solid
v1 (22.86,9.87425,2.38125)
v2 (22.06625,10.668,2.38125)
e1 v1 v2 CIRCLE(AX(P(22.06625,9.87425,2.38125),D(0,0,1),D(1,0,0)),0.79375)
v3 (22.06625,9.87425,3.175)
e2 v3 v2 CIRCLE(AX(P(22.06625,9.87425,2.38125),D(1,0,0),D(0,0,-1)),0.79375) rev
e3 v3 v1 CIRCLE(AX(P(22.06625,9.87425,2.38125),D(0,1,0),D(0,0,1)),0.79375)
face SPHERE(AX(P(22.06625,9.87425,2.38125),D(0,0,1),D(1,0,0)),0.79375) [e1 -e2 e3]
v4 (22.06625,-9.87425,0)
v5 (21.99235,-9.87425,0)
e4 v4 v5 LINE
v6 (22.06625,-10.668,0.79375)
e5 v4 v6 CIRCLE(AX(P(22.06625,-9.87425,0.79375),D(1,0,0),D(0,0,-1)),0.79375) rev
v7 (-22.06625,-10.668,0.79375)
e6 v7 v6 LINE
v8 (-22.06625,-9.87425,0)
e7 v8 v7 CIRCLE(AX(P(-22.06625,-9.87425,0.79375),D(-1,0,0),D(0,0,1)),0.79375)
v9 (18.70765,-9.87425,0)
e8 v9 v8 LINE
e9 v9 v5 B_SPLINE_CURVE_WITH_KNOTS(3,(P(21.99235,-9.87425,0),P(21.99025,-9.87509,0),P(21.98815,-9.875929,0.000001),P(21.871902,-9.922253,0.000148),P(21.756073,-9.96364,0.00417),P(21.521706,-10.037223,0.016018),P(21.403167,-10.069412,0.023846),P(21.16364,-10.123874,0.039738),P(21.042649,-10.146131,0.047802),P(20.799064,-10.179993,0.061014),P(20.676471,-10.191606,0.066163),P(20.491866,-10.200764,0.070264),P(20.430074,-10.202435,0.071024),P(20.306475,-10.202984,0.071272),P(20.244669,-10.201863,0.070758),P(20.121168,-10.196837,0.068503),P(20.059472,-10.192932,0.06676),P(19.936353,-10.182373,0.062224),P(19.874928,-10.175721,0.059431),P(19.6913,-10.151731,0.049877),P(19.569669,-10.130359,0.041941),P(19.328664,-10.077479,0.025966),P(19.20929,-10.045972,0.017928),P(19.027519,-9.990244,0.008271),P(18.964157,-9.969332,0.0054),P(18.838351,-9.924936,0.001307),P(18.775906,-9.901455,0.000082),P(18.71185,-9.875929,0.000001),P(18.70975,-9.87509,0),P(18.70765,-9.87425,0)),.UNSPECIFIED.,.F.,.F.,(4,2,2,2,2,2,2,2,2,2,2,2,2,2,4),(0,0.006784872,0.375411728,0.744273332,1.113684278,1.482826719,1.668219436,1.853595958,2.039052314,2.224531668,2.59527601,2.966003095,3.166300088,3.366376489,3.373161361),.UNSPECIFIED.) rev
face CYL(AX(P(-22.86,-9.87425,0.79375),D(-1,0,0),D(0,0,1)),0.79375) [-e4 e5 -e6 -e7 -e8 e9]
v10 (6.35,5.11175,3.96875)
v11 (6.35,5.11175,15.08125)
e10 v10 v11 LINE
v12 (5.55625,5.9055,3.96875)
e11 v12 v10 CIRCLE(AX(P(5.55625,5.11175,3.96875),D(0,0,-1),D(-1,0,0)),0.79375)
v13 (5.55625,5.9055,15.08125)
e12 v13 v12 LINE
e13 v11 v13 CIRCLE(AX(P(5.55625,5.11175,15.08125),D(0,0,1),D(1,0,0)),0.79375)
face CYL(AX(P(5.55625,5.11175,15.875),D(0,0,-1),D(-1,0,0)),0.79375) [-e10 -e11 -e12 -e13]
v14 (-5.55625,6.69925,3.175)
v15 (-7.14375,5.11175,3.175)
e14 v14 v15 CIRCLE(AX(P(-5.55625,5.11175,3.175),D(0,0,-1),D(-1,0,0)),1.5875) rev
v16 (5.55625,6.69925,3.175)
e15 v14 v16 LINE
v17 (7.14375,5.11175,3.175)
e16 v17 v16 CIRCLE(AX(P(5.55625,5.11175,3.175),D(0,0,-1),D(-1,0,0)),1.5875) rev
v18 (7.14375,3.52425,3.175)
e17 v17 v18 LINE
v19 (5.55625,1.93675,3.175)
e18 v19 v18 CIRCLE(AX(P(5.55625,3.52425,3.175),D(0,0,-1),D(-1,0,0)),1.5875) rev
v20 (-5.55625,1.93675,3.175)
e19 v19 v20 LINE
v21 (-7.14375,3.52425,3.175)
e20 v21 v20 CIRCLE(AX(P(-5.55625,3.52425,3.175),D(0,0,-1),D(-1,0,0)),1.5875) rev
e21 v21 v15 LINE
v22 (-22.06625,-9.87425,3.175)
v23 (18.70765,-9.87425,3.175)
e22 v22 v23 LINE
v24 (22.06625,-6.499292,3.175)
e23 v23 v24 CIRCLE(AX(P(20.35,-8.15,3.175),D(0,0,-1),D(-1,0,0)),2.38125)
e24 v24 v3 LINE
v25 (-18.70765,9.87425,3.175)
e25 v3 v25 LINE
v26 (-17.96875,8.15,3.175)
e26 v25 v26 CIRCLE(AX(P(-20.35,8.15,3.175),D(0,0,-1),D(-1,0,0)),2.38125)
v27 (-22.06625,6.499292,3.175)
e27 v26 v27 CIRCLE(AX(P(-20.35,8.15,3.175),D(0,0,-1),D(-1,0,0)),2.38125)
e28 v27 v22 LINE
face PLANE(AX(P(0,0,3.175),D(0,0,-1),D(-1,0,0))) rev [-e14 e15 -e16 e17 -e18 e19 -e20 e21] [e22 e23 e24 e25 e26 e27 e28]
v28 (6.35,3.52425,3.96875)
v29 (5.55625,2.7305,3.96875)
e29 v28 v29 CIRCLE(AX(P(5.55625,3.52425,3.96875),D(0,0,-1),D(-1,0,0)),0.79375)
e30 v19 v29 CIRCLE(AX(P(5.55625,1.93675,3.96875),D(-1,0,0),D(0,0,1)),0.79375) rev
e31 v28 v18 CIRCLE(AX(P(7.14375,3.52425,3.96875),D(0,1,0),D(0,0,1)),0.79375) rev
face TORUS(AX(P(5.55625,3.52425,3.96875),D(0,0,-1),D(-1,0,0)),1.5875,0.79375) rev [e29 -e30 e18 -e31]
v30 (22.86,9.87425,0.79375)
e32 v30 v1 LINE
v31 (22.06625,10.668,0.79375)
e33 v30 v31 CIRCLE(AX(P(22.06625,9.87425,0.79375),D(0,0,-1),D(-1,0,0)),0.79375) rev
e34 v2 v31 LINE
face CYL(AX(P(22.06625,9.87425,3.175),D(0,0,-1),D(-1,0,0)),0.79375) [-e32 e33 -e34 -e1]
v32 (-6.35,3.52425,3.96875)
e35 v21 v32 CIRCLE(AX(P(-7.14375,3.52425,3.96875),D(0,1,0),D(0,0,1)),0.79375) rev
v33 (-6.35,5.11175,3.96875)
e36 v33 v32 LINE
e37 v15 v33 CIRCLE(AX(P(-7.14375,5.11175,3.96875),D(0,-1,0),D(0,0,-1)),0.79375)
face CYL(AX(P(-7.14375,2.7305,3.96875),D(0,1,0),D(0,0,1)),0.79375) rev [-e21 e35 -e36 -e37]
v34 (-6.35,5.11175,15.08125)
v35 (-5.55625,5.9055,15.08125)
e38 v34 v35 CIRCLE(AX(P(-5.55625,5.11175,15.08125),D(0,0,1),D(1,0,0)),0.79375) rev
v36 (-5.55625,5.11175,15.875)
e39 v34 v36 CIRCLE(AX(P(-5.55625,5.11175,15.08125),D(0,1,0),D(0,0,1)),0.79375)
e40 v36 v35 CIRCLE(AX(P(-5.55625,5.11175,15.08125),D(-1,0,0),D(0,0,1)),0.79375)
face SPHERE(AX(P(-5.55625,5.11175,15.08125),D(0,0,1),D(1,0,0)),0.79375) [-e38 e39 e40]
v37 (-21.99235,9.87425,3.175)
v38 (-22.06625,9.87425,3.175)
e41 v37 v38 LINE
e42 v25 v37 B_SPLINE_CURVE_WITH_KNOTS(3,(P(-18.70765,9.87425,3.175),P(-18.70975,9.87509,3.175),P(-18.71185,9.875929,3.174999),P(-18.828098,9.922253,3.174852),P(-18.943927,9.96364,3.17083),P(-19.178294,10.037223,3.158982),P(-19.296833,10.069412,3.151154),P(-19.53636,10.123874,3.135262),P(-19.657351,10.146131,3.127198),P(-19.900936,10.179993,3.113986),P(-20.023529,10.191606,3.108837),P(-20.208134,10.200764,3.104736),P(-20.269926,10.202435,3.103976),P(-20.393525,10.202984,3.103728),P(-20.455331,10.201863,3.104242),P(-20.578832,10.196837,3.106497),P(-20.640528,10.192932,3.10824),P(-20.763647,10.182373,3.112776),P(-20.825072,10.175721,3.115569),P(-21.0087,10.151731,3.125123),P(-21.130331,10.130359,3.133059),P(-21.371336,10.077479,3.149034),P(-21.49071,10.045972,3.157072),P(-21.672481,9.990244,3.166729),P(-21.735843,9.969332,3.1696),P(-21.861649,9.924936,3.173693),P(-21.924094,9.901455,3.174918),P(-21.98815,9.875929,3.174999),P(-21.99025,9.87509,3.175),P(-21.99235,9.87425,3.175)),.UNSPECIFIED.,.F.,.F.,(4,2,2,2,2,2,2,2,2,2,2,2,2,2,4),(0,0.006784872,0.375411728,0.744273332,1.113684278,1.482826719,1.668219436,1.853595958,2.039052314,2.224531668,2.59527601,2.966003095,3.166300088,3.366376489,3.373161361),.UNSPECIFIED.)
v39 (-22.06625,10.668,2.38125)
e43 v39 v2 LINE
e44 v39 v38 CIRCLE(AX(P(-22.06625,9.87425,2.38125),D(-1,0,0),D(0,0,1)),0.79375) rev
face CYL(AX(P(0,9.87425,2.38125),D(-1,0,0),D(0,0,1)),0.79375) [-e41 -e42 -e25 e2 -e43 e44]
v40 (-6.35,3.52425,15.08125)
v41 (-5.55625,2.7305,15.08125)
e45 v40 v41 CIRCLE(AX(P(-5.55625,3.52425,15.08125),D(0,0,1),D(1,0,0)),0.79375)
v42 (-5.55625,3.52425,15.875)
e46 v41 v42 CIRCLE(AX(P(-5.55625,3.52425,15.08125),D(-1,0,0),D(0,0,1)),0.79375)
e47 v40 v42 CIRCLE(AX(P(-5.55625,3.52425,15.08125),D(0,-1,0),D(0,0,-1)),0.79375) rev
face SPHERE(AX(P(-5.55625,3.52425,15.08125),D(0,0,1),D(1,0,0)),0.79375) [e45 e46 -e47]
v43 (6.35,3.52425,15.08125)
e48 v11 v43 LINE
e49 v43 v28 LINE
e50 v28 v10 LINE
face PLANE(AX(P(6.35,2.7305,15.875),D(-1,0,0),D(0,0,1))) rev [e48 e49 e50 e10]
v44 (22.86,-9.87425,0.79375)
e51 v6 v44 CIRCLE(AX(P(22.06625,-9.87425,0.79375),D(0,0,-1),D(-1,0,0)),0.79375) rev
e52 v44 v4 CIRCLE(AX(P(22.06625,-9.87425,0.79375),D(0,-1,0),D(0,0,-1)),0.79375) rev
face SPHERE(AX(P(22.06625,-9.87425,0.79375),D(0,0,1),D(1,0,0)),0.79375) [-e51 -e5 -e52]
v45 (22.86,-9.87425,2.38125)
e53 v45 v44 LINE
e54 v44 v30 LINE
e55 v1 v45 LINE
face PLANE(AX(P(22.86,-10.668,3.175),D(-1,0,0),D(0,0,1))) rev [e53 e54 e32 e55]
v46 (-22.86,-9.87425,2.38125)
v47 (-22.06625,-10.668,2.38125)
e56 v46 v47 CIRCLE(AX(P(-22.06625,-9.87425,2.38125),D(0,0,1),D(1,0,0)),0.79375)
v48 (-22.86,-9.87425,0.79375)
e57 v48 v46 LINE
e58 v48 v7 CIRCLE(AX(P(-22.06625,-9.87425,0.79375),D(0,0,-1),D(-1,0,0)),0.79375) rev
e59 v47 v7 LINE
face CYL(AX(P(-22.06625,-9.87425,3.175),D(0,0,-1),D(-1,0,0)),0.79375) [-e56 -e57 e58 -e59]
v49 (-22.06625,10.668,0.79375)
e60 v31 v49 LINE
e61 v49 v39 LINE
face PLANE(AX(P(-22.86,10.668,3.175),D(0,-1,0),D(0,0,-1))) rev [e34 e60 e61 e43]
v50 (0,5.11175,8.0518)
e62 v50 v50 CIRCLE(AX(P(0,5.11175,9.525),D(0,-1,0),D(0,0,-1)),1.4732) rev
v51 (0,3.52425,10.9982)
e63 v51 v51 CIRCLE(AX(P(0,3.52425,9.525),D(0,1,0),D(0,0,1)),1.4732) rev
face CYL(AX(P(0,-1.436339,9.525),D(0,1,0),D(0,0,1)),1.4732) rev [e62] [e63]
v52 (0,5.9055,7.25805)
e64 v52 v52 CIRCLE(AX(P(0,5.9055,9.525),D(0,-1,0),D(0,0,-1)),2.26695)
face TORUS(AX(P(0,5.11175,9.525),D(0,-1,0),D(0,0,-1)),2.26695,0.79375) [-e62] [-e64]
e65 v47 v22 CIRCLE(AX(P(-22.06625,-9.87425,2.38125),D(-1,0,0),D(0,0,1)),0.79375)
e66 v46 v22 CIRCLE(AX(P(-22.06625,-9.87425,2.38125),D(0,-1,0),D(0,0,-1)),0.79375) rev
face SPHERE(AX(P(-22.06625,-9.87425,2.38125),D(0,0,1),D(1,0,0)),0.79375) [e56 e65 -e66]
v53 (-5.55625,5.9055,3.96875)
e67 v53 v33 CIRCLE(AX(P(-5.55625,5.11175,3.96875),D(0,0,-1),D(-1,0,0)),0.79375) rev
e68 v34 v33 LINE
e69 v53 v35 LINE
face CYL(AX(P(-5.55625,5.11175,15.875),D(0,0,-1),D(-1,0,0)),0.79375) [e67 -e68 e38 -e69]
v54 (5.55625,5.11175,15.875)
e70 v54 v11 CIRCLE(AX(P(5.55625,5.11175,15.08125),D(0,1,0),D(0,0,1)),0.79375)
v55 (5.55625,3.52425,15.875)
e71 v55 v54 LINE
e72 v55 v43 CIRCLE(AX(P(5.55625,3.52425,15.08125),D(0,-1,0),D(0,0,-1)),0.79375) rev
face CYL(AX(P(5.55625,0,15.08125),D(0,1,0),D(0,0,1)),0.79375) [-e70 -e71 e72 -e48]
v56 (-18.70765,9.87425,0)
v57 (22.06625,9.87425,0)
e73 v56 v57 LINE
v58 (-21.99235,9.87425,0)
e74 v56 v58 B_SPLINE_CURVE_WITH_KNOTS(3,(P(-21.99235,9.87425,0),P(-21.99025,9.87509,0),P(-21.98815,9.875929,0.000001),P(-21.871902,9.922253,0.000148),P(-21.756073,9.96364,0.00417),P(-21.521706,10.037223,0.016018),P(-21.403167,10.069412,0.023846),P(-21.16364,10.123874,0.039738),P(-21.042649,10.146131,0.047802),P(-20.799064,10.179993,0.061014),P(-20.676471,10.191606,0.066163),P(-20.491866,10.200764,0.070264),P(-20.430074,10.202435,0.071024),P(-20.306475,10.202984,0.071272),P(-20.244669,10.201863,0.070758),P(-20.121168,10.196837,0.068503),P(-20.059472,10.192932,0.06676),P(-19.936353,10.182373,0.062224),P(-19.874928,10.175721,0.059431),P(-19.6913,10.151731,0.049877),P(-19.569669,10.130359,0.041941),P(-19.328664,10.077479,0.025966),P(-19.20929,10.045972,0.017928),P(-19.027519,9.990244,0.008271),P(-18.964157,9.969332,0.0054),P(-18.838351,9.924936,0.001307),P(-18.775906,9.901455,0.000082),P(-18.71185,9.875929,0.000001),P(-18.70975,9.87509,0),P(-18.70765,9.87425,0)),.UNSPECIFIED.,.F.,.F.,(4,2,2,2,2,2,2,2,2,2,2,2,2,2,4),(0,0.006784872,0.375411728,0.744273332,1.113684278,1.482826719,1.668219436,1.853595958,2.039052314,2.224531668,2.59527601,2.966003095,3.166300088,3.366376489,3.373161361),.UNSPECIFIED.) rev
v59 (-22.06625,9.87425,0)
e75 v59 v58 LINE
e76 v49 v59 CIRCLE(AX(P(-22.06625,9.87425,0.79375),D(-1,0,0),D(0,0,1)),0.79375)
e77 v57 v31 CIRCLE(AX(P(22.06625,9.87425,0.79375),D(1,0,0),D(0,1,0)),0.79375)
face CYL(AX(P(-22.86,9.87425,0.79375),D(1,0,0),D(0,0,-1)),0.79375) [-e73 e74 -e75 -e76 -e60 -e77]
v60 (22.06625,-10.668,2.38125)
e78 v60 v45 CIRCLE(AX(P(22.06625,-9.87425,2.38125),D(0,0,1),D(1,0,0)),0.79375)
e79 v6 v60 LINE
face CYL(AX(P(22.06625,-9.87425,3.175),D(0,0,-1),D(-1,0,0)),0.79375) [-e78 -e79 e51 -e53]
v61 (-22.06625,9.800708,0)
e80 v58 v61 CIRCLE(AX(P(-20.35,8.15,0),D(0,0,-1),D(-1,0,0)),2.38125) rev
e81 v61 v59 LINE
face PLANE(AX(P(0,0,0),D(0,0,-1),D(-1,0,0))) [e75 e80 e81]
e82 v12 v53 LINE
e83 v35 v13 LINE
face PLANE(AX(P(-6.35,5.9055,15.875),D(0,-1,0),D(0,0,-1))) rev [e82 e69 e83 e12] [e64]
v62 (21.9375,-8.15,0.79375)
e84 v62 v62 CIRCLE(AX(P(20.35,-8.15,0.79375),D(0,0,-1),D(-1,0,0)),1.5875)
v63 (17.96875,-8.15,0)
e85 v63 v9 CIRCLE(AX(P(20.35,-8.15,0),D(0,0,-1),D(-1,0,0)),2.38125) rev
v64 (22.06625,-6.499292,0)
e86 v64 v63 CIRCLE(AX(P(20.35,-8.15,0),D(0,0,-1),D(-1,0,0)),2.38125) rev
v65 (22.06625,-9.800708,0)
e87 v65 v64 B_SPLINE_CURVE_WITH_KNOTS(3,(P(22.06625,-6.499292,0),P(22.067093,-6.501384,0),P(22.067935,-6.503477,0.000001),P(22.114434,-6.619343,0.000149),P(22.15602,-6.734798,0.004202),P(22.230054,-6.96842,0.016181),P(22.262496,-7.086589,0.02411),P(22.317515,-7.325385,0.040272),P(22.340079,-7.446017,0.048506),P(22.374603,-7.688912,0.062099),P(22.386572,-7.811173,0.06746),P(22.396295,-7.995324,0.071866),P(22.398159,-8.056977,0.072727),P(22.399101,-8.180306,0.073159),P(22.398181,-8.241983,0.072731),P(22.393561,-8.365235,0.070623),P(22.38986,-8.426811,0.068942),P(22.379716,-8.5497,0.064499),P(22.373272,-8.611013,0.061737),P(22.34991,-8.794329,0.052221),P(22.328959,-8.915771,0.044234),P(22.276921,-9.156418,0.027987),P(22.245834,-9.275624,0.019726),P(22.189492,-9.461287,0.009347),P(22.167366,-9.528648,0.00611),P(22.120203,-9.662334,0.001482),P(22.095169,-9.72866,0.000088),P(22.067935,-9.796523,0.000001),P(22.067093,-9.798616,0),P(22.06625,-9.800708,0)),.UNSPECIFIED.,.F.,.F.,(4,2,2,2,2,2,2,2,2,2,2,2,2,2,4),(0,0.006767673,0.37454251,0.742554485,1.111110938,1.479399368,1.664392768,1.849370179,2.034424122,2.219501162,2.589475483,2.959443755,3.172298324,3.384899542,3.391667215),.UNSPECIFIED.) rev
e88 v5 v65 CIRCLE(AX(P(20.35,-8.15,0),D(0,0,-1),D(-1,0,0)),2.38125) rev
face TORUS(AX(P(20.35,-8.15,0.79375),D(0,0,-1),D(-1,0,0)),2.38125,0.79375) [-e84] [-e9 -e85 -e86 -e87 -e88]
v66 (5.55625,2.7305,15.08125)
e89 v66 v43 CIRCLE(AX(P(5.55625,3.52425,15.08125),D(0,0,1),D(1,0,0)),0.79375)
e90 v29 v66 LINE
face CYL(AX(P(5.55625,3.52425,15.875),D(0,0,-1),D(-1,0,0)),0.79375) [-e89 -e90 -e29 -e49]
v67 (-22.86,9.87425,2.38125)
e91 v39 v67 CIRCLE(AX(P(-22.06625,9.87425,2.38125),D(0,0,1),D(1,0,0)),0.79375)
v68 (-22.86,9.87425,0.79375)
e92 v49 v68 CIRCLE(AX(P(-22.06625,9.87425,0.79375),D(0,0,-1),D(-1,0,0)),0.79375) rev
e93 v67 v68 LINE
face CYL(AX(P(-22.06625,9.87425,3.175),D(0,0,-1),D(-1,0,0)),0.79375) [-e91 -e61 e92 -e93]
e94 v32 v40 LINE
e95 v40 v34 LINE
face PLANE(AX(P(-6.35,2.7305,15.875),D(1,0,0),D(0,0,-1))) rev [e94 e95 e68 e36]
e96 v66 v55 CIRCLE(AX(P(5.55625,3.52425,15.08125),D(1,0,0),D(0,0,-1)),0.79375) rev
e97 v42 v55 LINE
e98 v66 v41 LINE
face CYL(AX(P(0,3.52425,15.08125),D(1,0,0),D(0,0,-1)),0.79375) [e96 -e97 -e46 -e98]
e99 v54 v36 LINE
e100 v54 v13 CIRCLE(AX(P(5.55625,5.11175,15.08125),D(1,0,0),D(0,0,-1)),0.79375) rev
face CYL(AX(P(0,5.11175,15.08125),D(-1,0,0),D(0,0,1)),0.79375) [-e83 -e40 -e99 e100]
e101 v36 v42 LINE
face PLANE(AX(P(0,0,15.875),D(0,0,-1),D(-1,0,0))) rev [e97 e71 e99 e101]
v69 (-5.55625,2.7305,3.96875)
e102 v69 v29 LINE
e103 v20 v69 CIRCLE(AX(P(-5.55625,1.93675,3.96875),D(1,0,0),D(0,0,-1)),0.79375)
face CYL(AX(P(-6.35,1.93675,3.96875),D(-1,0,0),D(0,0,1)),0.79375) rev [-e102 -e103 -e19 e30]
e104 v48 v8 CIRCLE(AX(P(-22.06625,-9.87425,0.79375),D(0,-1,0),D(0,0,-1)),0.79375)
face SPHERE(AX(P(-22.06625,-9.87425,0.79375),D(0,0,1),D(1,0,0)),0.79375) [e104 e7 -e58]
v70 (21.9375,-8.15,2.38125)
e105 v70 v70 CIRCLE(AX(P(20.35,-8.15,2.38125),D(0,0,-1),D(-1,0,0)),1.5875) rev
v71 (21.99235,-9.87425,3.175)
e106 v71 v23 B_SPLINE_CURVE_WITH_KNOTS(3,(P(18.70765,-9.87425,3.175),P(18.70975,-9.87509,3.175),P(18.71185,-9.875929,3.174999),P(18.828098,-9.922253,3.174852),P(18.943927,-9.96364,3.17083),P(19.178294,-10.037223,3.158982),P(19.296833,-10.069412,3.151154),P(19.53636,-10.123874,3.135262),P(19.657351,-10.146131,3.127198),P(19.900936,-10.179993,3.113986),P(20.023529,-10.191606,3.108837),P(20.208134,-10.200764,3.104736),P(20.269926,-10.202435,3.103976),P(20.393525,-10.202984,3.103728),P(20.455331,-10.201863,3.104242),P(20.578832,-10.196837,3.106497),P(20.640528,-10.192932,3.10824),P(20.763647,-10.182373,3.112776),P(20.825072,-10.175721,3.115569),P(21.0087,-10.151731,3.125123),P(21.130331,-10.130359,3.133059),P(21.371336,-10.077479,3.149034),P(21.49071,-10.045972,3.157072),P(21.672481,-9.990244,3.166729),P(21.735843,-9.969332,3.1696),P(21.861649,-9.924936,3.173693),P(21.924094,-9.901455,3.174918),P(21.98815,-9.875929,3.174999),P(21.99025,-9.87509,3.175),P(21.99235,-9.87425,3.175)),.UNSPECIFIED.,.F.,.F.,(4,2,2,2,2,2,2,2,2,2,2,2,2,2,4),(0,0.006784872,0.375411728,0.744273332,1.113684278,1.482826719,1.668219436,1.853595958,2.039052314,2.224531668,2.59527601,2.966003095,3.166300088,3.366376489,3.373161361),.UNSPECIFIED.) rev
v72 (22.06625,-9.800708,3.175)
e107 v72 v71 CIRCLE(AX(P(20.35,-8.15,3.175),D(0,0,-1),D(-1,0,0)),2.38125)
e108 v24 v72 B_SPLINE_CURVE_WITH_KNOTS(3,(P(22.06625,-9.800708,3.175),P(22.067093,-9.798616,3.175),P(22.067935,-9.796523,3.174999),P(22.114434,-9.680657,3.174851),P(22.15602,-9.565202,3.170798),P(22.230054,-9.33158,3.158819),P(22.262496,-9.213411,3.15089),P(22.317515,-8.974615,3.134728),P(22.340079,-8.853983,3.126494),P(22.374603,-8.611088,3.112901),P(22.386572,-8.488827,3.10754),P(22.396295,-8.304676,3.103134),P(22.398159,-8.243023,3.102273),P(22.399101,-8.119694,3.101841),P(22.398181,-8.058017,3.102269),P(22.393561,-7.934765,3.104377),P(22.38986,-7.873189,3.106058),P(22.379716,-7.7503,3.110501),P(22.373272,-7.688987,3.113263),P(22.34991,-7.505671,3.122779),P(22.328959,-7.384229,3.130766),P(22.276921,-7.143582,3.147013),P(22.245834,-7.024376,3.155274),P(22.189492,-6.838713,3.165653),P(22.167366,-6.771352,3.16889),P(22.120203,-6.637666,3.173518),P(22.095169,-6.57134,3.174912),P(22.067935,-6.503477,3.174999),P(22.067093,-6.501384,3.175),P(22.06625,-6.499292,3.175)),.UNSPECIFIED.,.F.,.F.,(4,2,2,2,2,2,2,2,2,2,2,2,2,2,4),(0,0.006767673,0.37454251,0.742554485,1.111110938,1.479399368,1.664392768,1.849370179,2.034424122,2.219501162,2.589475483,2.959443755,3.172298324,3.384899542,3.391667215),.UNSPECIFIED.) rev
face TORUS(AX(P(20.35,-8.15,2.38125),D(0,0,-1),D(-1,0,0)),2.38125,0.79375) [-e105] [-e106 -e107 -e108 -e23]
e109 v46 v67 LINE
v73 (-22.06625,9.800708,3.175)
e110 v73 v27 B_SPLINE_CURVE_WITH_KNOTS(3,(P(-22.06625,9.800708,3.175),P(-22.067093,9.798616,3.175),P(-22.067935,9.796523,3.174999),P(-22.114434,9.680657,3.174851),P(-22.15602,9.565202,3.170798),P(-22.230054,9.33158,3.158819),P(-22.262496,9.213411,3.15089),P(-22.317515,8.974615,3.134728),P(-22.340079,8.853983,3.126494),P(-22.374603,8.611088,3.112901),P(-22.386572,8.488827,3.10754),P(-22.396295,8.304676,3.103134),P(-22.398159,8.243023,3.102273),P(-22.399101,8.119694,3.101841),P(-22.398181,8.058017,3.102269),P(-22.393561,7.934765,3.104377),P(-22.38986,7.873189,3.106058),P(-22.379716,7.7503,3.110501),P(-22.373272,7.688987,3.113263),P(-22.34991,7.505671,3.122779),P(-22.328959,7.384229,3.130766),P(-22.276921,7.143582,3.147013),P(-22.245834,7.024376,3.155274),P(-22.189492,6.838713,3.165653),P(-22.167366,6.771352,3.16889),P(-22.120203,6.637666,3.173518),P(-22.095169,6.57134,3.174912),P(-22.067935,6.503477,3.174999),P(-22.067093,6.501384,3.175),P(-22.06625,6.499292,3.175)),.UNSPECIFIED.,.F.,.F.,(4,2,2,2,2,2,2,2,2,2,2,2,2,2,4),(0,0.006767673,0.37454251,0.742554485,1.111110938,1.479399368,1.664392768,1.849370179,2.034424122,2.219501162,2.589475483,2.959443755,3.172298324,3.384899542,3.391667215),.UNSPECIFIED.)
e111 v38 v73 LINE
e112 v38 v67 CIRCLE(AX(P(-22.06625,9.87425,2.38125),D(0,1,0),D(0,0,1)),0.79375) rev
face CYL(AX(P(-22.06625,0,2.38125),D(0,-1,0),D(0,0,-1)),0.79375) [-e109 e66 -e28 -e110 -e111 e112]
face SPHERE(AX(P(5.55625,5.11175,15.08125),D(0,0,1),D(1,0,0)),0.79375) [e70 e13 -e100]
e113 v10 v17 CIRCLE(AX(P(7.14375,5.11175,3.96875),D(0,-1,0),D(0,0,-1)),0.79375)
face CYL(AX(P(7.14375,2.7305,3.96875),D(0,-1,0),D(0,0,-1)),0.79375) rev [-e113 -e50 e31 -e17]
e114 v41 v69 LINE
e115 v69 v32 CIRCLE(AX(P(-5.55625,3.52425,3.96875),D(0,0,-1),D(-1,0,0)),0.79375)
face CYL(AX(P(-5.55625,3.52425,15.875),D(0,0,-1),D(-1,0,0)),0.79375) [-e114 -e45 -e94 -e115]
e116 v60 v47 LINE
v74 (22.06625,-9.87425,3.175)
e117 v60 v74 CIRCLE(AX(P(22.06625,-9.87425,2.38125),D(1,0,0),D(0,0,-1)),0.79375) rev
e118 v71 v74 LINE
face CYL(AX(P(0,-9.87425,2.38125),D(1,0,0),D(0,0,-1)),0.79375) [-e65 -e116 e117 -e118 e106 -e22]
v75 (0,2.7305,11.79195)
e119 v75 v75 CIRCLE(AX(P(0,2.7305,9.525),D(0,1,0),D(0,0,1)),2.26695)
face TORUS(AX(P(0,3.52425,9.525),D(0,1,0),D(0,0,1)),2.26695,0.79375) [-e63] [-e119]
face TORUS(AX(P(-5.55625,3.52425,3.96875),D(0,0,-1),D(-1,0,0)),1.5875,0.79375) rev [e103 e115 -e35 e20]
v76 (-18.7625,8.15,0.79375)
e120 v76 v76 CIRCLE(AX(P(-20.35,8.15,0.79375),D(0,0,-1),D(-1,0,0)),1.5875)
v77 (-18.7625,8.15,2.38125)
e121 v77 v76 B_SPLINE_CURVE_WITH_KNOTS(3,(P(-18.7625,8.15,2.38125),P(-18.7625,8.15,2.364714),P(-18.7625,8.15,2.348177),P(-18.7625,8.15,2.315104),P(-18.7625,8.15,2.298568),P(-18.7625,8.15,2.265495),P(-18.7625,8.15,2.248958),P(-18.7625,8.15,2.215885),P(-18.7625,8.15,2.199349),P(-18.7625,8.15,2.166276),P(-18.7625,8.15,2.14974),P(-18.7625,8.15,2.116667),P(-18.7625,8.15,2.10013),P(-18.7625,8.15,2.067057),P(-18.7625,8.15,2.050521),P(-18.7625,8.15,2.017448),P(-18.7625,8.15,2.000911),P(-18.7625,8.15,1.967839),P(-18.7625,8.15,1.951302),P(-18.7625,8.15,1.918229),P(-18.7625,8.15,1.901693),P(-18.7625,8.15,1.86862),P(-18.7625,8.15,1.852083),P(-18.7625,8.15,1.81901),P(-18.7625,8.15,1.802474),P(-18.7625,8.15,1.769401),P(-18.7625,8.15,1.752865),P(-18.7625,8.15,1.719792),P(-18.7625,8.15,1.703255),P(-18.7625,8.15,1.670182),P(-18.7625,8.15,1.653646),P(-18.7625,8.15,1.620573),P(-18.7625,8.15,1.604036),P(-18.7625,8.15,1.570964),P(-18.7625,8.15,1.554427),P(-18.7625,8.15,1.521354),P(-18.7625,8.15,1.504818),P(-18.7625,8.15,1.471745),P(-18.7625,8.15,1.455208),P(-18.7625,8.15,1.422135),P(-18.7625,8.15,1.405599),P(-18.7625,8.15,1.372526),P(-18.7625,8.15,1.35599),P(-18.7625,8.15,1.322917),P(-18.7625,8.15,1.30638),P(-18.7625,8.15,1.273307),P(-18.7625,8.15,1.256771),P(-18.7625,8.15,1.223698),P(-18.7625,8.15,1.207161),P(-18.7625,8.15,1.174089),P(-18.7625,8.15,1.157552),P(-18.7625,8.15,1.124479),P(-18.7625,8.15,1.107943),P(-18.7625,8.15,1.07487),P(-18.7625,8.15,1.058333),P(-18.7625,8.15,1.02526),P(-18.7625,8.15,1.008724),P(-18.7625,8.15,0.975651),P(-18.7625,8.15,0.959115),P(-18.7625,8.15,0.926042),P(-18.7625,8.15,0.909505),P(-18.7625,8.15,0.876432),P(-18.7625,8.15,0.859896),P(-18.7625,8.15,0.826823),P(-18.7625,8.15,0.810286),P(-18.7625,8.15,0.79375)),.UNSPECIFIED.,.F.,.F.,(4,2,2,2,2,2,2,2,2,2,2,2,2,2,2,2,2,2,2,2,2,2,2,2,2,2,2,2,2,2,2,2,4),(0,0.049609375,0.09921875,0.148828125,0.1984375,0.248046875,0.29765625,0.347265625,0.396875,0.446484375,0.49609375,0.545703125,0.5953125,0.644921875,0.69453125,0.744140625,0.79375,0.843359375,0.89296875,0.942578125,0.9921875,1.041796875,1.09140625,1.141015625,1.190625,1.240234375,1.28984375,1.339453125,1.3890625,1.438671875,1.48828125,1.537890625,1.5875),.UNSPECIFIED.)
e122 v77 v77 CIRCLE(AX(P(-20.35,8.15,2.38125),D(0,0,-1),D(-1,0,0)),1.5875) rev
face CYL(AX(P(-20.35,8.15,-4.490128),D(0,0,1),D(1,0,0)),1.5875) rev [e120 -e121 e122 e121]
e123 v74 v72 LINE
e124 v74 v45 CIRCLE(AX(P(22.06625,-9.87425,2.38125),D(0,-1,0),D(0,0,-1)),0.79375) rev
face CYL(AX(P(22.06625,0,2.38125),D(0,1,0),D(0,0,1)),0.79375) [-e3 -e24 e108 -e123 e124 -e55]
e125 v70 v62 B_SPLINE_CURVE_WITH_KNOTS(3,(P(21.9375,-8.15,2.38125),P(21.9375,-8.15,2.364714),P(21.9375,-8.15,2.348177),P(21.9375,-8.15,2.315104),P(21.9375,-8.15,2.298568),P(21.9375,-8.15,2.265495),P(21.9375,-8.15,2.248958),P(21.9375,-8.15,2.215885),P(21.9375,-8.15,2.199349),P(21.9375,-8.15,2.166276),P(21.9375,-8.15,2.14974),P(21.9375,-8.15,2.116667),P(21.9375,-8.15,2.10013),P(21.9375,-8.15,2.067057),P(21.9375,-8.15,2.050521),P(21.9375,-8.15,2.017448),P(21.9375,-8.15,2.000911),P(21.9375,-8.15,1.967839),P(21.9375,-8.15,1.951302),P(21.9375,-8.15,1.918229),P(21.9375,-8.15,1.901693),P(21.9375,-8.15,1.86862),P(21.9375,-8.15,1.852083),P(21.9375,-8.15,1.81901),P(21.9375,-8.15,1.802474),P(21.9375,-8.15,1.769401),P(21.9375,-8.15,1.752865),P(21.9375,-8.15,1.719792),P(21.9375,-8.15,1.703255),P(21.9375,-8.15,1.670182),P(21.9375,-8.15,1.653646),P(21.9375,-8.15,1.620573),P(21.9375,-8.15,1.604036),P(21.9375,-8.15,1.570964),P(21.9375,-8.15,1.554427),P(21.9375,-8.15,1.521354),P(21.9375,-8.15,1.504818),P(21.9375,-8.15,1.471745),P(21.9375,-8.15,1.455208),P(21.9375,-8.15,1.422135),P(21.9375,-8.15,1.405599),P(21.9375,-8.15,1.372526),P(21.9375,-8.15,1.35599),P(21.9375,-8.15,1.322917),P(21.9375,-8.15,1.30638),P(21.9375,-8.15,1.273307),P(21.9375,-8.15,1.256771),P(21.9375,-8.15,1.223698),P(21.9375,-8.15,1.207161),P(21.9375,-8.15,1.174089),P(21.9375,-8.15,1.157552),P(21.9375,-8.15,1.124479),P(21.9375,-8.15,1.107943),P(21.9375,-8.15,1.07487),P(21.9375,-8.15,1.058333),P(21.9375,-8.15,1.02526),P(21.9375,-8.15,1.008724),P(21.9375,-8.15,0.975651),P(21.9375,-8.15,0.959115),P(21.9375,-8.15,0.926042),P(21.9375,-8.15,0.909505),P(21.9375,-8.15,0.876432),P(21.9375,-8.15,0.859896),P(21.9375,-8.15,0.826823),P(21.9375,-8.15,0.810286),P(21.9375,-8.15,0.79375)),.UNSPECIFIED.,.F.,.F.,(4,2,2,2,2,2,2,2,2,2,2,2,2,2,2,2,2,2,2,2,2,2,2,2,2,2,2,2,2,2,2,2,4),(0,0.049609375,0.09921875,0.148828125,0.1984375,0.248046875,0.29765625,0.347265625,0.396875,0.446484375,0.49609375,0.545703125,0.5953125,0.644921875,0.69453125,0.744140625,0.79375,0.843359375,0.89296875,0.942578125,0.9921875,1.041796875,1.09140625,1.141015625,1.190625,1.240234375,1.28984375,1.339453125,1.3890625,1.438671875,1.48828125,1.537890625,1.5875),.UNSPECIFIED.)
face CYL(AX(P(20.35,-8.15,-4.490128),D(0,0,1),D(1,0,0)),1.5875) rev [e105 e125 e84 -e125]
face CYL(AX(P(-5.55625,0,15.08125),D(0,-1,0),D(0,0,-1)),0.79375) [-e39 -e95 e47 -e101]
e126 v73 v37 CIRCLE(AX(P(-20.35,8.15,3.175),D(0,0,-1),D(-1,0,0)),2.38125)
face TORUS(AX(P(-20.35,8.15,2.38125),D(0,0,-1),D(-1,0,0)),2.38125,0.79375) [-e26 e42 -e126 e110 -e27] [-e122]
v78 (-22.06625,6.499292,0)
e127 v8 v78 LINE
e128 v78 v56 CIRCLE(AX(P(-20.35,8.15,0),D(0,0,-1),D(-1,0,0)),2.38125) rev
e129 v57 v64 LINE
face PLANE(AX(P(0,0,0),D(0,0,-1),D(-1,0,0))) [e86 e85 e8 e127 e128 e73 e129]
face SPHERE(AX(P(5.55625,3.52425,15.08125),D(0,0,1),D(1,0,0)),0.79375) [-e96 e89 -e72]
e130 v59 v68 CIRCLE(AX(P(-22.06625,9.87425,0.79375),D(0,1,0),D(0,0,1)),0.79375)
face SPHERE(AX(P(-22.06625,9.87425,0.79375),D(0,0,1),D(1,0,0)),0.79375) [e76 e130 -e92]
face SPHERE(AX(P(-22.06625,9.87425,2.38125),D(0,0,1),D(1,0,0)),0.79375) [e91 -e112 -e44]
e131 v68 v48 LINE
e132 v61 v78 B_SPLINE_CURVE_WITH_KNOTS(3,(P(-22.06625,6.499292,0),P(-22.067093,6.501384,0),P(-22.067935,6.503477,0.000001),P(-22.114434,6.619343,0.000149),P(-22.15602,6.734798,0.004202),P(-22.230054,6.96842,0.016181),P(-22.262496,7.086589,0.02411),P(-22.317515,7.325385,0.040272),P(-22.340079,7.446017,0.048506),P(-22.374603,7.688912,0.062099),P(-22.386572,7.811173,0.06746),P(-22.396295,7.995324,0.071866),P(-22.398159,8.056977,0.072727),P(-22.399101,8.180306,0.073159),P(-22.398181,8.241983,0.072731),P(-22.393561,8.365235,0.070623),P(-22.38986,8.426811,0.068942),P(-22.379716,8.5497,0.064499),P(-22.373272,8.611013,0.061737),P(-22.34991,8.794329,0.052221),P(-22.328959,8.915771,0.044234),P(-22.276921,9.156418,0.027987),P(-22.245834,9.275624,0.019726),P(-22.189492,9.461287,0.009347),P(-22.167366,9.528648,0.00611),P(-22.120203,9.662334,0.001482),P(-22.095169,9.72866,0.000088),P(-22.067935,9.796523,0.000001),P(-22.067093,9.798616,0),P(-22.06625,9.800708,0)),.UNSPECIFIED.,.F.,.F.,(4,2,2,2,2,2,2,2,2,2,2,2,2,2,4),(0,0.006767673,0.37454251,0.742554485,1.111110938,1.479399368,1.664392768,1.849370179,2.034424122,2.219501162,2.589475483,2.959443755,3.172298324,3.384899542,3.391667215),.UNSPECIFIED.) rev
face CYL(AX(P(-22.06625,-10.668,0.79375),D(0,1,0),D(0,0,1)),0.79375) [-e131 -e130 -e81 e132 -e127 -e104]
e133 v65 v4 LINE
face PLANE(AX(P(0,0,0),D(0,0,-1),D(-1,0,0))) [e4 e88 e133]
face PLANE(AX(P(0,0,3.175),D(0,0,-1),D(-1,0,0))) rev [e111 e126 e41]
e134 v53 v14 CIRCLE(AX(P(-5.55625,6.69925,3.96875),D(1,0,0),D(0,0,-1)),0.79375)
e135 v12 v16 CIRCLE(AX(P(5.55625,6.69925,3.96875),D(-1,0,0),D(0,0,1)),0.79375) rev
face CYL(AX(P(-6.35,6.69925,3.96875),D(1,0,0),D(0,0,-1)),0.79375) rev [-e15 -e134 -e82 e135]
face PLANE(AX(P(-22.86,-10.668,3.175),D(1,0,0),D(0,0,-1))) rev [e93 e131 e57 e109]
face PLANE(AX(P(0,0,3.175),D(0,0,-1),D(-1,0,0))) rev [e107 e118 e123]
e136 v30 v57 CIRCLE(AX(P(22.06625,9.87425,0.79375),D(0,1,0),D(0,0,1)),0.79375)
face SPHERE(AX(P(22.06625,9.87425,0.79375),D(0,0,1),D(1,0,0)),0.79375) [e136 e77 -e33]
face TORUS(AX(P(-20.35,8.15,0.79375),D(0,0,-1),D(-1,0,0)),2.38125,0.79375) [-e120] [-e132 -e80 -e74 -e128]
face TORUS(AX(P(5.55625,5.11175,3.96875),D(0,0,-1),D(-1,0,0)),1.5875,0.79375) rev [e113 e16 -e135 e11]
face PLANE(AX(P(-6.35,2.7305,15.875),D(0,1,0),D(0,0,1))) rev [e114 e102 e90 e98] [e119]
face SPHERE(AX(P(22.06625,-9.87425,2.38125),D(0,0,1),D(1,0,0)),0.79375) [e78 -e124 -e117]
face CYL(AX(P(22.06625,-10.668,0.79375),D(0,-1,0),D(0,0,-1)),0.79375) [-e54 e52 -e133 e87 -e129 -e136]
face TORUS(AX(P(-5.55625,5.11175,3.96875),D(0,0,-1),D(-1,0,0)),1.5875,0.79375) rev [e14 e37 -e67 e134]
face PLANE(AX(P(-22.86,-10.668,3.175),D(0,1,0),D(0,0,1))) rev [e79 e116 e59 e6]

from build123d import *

# Parameters (mm, degrees)
SKETCH3_W           = 45.72
SKETCH3_H           = 21.336
BOSS_EXTRUDE1_DEPTH = 3.175
SKETCH4_R           = 1.5875
CUT_EXTRUDE1_DEPTH  = 3.175
SKETCH6_W           = 12.7
SKETCH6_H           = 3.175
BOSS_EXTRUDE2_DEPTH = 12.7
SKETCH7_R           = 1.4732
CUT_EXTRUDE2_DEPTH  = 3.175
FILLET1_R           = 0.79375


with BuildPart() as part:
    # Sketch3 → Boss-Extrude1 (new body)
    with BuildSketch(Plane.XY):
        Rectangle(SKETCH3_W, SKETCH3_H)
    extrude(amount=BOSS_EXTRUDE1_DEPTH)

    # Sketch4 → Cut-Extrude1 (cut)
    with BuildSketch(Plane.XY.offset(3.175)):
        with Locations((-20.35, 8.15)):
            Circle(SKETCH4_R)
        with Locations((20.35, -8.15)):
            Circle(SKETCH4_R)
    extrude(amount=-CUT_EXTRUDE1_DEPTH, mode=Mode.SUBTRACT)

    # Sketch6 → Boss-Extrude2 (add)
    with BuildSketch(Plane.XY.offset(3.175)):
        with Locations((0, 4.318)):
            Rectangle(SKETCH6_W, SKETCH6_H)
    extrude(amount=BOSS_EXTRUDE2_DEPTH)

    # Sketch7 → Cut-Extrude2 (cut)
    with BuildSketch(Plane(origin=(0, 5.9055, 0), x_dir=(1, 0, 0), z_dir=(0, 1, 0))):
        with Locations(Location((0, -9.525, 0), (0, 0, 270))):
            Circle(SKETCH7_R)
    extrude(amount=-CUT_EXTRUDE2_DEPTH, mode=Mode.SUBTRACT)

    # Fillet1
    # the kernel refuses this fillet: 0.79375 mm, written as the material it takes off along each edge
    with BuildSketch(Plane(origin=(-22.06625, 9.87425, 2.38125), x_dir=(0, 0, 1), z_dir=(-1, 0, 0))) as fillet1_piece_1_section:
        Polygon((0, 0), (FILLET1_R, 0), (FILLET1_R, FILLET1_R), (0, FILLET1_R), align=None)
    fillet1_piece_1 = extrude(amount=FILLET1_R, mode=Mode.PRIVATE)
    fillet1_piece_1 = fillet1_piece_1 - Plane(origin=(-22.06625, 9.87425, 2.38125), x_dir=(0, -0.7071067811865475, -0.7071067811865475), z_dir=(-1, 0, 0)) * Sphere(FILLET1_R, mode=Mode.PRIVATE)
    add(fillet1_piece_1, mode=Mode.SUBTRACT)
    with BuildSketch(Plane(origin=(-22.06625, -9.87425, 2.38125), x_dir=(-1, 0, 0), z_dir=(0, -1, 0))) as fillet1_piece_2_section:
        Polygon((0, 0), (FILLET1_R, 0), (FILLET1_R, -FILLET1_R), (0, -FILLET1_R), align=None)
    fillet1_piece_2 = extrude(amount=FILLET1_R, mode=Mode.PRIVATE)
    fillet1_piece_2 = fillet1_piece_2 - Plane(origin=(-22.06625, -9.87425, 2.38125), x_dir=(0.7071067811865475, 0, -0.7071067811865475), z_dir=(0, -1, 0)) * Sphere(FILLET1_R, mode=Mode.PRIVATE)
    add(fillet1_piece_2, mode=Mode.SUBTRACT)
    with BuildSketch(Plane(origin=(22.06625, -9.87425, 2.38125), x_dir=(1, 0, 0), z_dir=(0, -1, 0))) as fillet1_piece_3_section:
        Polygon((0, 0), (FILLET1_R, 0), (FILLET1_R, FILLET1_R), (0, FILLET1_R), align=None)
    fillet1_piece_3 = extrude(amount=FILLET1_R, mode=Mode.PRIVATE)
    fillet1_piece_3 = fillet1_piece_3 - Plane(origin=(22.06625, -9.87425, 2.38125), x_dir=(-0.7071067811865475, 0, -0.7071067811865475), z_dir=(0, -1, 0)) * Sphere(FILLET1_R, mode=Mode.PRIVATE)
    add(fillet1_piece_3, mode=Mode.SUBTRACT)
    with BuildSketch(Plane(origin=(5.55625, 3.52425, 15.08125), x_dir=(1, 0, 0), z_dir=(0, -1, 0))) as fillet1_piece_4_section:
        Polygon((0, 0), (FILLET1_R, 0), (FILLET1_R, FILLET1_R), (0, FILLET1_R), align=None)
    fillet1_piece_4 = extrude(amount=FILLET1_R, mode=Mode.PRIVATE)
    fillet1_piece_4 = fillet1_piece_4 - Plane(origin=(5.55625, 3.52425, 15.08125), x_dir=(-0.7071067811865475, 0, -0.7071067811865475), z_dir=(0, -1, 0)) * Sphere(FILLET1_R, mode=Mode.PRIVATE)
    add(fillet1_piece_4, mode=Mode.SUBTRACT)
    with BuildSketch(Plane(origin=(5.55625, 5.11175, 15.08125), x_dir=(0, 1, 0), z_dir=(1, 0, 0))) as fillet1_piece_5_section:
        Polygon((0, 0), (FILLET1_R, 0), (FILLET1_R, FILLET1_R), (0, FILLET1_R), align=None)
    fillet1_piece_5 = extrude(amount=FILLET1_R, mode=Mode.PRIVATE)
    fillet1_piece_5 = fillet1_piece_5 - Plane(origin=(5.55625, 5.11175, 15.08125), x_dir=(0, -0.7071067811865475, -0.7071067811865475), z_dir=(1, 0, 0)) * Sphere(FILLET1_R, mode=Mode.PRIVATE)
    add(fillet1_piece_5, mode=Mode.SUBTRACT)
    with BuildSketch(Plane(origin=(-5.55625, 5.11175, 15.08125), x_dir=(-1, 0, 0), z_dir=(0, 1, 0))) as fillet1_piece_6_section:
        Polygon((0, 0), (FILLET1_R, 0), (FILLET1_R, FILLET1_R), (0, FILLET1_R), align=None)
    fillet1_piece_6 = extrude(amount=FILLET1_R, mode=Mode.PRIVATE)
    fillet1_piece_6 = fillet1_piece_6 - Plane(origin=(-5.55625, 5.11175, 15.08125), x_dir=(0.7071067811865475, 0, -0.7071067811865475), z_dir=(0, 1, 0)) * Sphere(FILLET1_R, mode=Mode.PRIVATE)
    add(fillet1_piece_6, mode=Mode.SUBTRACT)
    with BuildSketch(Plane(origin=(-5.55625, 3.52425, 15.08125), x_dir=(-1, 0, 0), z_dir=(0, -1, 0))) as fillet1_piece_7_section:
        Polygon((0, 0), (FILLET1_R, 0), (FILLET1_R, -FILLET1_R), (0, -FILLET1_R), align=None)
    fillet1_piece_7 = extrude(amount=FILLET1_R, mode=Mode.PRIVATE)
    fillet1_piece_7 = fillet1_piece_7 - Plane(origin=(-5.55625, 3.52425, 15.08125), x_dir=(0.7071067811865475, 0, -0.7071067811865475), z_dir=(0, -1, 0)) * Sphere(FILLET1_R, mode=Mode.PRIVATE)
    add(fillet1_piece_7, mode=Mode.SUBTRACT)
    with BuildSketch(Plane(origin=(22.06625, 9.87425, 2.38125), x_dir=(0, 0, 1), z_dir=(1, 0, 0))) as fillet1_piece_8_section:
        Polygon((0, 0), (FILLET1_R, 0), (FILLET1_R, -FILLET1_R), (0, -FILLET1_R), align=None)
    fillet1_piece_8 = extrude(amount=FILLET1_R, mode=Mode.PRIVATE)
    fillet1_piece_8 = fillet1_piece_8 - Plane(origin=(22.06625, 9.87425, 2.38125), x_dir=(0, -0.7071067811865475, -0.7071067811865475), z_dir=(1, 0, 0)) * Sphere(FILLET1_R, mode=Mode.PRIVATE)
    add(fillet1_piece_8, mode=Mode.SUBTRACT)
    with BuildSketch(Plane(origin=(-22.06625, -9.87425, 0.79375), x_dir=(-1, 0, 0), z_dir=(0, -1, 0))) as fillet1_piece_9_section:
        Polygon((0, 0), (FILLET1_R, 0), (FILLET1_R, FILLET1_R), (0, FILLET1_R), align=None)
    fillet1_piece_9 = extrude(amount=FILLET1_R, mode=Mode.PRIVATE)
    fillet1_piece_9 = fillet1_piece_9 - Plane(origin=(-22.06625, -9.87425, 0.79375), x_dir=(0.7071067811865475, 0, 0.7071067811865475), z_dir=(0, -1, 0)) * Sphere(FILLET1_R, mode=Mode.PRIVATE)
    add(fillet1_piece_9, mode=Mode.SUBTRACT)
    with BuildSketch(Plane(origin=(22.06625, -9.87425, 0.79375), x_dir=(1, 0, 0), z_dir=(0, -1, 0))) as fillet1_piece_10_section:
        Polygon((0, 0), (FILLET1_R, 0), (FILLET1_R, -FILLET1_R), (0, -FILLET1_R), align=None)
    fillet1_piece_10 = extrude(amount=FILLET1_R, mode=Mode.PRIVATE)
    fillet1_piece_10 = fillet1_piece_10 - Plane(origin=(22.06625, -9.87425, 0.79375), x_dir=(-0.7071067811865475, 0, 0.7071067811865475), z_dir=(0, -1, 0)) * Sphere(FILLET1_R, mode=Mode.PRIVATE)
    add(fillet1_piece_10, mode=Mode.SUBTRACT)
    with BuildSketch(Plane(origin=(-22.06625, 9.87425, 0.79375), x_dir=(0, 0, -1), z_dir=(-1, 0, 0))) as fillet1_piece_11_section:
        Polygon((0, 0), (FILLET1_R, 0), (FILLET1_R, -FILLET1_R), (0, -FILLET1_R), align=None)
    fillet1_piece_11 = extrude(amount=FILLET1_R, mode=Mode.PRIVATE)
    fillet1_piece_11 = fillet1_piece_11 - Plane(origin=(-22.06625, 9.87425, 0.79375), x_dir=(0, -0.7071067811865475, 0.7071067811865475), z_dir=(-1, 0, 0)) * Sphere(FILLET1_R, mode=Mode.PRIVATE)
    add(fillet1_piece_11, mode=Mode.SUBTRACT)
    with BuildSketch(Plane(origin=(22.06625, 9.87425, 0.79375), x_dir=(0, 0, -1), z_dir=(1, 0, 0))) as fillet1_piece_12_section:
        Polygon((0, 0), (FILLET1_R, 0), (FILLET1_R, FILLET1_R), (0, FILLET1_R), align=None)
    fillet1_piece_12 = extrude(amount=FILLET1_R, mode=Mode.PRIVATE)
    fillet1_piece_12 = fillet1_piece_12 - Plane(origin=(22.06625, 9.87425, 0.79375), x_dir=(0, -0.7071067811865475, 0.7071067811865475), z_dir=(1, 0, 0)) * Sphere(FILLET1_R, mode=Mode.PRIVATE)
    add(fillet1_piece_12, mode=Mode.SUBTRACT)
    with BuildSketch(Plane(origin=(-22.86, 9.87425, 3.175), x_dir=(0, 0, -1), z_dir=(0, -1, 0)), Plane(origin=(22.86, -9.87425, 3.175), x_dir=(0, 0, -1), z_dir=(0, 1, 0))) as fillet1_piece_13:
        with BuildLine():
            CenterArc((FILLET1_R, FILLET1_R), FILLET1_R, 180, 90)
            Line((0, FILLET1_R), (0, 0))
            Line((0, 0), (FILLET1_R, 0))
        make_face()
    extrude(amount=19.7485, mode=Mode.SUBTRACT)
    with BuildSketch(Plane(origin=(-22.06625, -10.668, 3.175), x_dir=(0, 0, -1), z_dir=(1, 0, 0)), Plane(origin=(22.06625, 10.668, 0), x_dir=(0, -1, 0), z_dir=(-1, 0, 0))) as fillet1_piece_14:
        with BuildLine():
            CenterArc((FILLET1_R, FILLET1_R), FILLET1_R, 180, 90)
            Line((0, FILLET1_R), (0, 0))
            Line((0, 0), (FILLET1_R, 0))
        make_face()
    extrude(amount=44.1325, mode=Mode.SUBTRACT)
    with BuildSketch(Plane(origin=(-20.35, 8.15, 3.175), x_dir=(1, 0, 0), z_dir=(0, -1, 0))) as fillet1_piece_15:
        with BuildLine():
            CenterArc((1.5875 + FILLET1_R, -FILLET1_R), FILLET1_R, 90, 90)
            Line((1.5875, -FILLET1_R), (1.5875, 0))
            Line((1.5875, 0), (1.5875 + FILLET1_R, 0))
        make_face()
    revolve(axis=Axis((-20.35, 8.15, 3.175), (0, 0, 1)), mode=Mode.SUBTRACT)
    with BuildSketch(Plane(origin=(-20.35, 8.15, 0), x_dir=(1, 0, 0), z_dir=(0, -1, 0))) as fillet1_piece_16:
        with BuildLine():
            CenterArc((1.5875 + FILLET1_R, FILLET1_R), FILLET1_R, 180, 90)
            Line((1.5875, FILLET1_R), (1.5875, 0))
            Line((1.5875, 0), (1.5875 + FILLET1_R, 0))
        make_face()
    revolve(axis=Axis((-20.35, 8.15, 0), (0, 0, 1)), mode=Mode.SUBTRACT)
    with BuildSketch(Plane(origin=(20.35, -8.15, 3.175), x_dir=(1, 0, 0), z_dir=(0, -1, 0))) as fillet1_piece_17:
        with BuildLine():
            CenterArc((1.5875 + FILLET1_R, -FILLET1_R), FILLET1_R, 90, 90)
            Line((1.5875, -FILLET1_R), (1.5875, 0))
            Line((1.5875, 0), (1.5875 + FILLET1_R, 0))
        make_face()
    revolve(axis=Axis((20.35, -8.15, 3.175), (0, 0, 1)), mode=Mode.SUBTRACT)
    with BuildSketch(Plane(origin=(20.35, -8.15, 0), x_dir=(1, 0, 0), z_dir=(0, -1, 0))) as fillet1_piece_18:
        with BuildLine():
            CenterArc((1.5875 + FILLET1_R, FILLET1_R), FILLET1_R, 180, 90)
            Line((1.5875, FILLET1_R), (1.5875, 0))
            Line((1.5875, 0), (1.5875 + FILLET1_R, 0))
        make_face()
    revolve(axis=Axis((20.35, -8.15, 0), (0, 0, 1)), mode=Mode.SUBTRACT)
    with BuildSketch(Plane(origin=(6.35, 2.7305, 3.175), x_dir=(-1, 0, 0), z_dir=(0, 0, 1)), Plane(origin=(6.35, 5.9055, 3.175), x_dir=(0, -1, 0), z_dir=(0, 0, 1)), Plane(origin=(-6.35, 5.9055, 3.175), x_dir=(1, 0, 0), z_dir=(0, 0, 1))) as fillet1_piece_19:
        with BuildLine():
            CenterArc((FILLET1_R, -FILLET1_R), FILLET1_R, 90, 90)
            Line((0, -FILLET1_R), (0, 0))
            Line((0, 0), (FILLET1_R, 0))
        make_face()
    extrude(amount=11.90625, mode=Mode.SUBTRACT)
    with BuildSketch(Plane(origin=(-6.35, 2.7305, 3.175), x_dir=(1, 0, 0), z_dir=(0, 0, 1))) as fillet1_piece_20:
        with BuildLine():
            CenterArc((FILLET1_R, FILLET1_R), FILLET1_R, 180, 90)
            Line((0, FILLET1_R), (0, 0))
            Line((0, 0), (FILLET1_R, 0))
        make_face()
    extrude(amount=11.90625, mode=Mode.SUBTRACT)
    with BuildSketch(Plane(origin=(6.35, 3.52425, 15.875), x_dir=(0, 0, -1), z_dir=(0, 1, 0)), Plane(origin=(-6.35, 5.11175, 15.875), x_dir=(0, 0, -1), z_dir=(0, -1, 0)), Plane(origin=(-22.86, -10.668, 0.79375), x_dir=(1, 0, 0), z_dir=(0, 0, 1)), Plane(origin=(-22.86, 10.668, 0.79375), x_dir=(0, -1, 0), z_dir=(0, 0, 1))) as fillet1_piece_21:
        with BuildLine():
            CenterArc((FILLET1_R, FILLET1_R), FILLET1_R, 180, 90)
            Line((0, FILLET1_R), (0, 0))
            Line((0, 0), (FILLET1_R, 0))
        make_face()
    extrude(amount=1.5875, mode=Mode.SUBTRACT)
    with BuildSketch(Plane(origin=(5.55625, 5.9055, 15.875), x_dir=(0, 0, -1), z_dir=(-1, 0, 0)), Plane(origin=(-5.55625, 2.7305, 15.875), x_dir=(0, 0, -1), z_dir=(1, 0, 0))) as fillet1_piece_22:
        with BuildLine():
            CenterArc((FILLET1_R, FILLET1_R), FILLET1_R, 180, 90)
            Line((0, FILLET1_R), (0, 0))
            Line((0, 0), (FILLET1_R, 0))
        make_face()
    extrude(amount=11.1125, mode=Mode.SUBTRACT)
    with BuildSketch(Plane(origin=(0, 5.9055, 9.525), x_dir=(0, 0, 1), z_dir=(-1, 0, 0))) as fillet1_piece_23:
        with BuildLine():
            CenterArc((1.4732 + FILLET1_R, -FILLET1_R), FILLET1_R, 90, 90)
            Line((1.4732, -FILLET1_R), (1.4732, 0))
            Line((1.4732, 0), (1.4732 + FILLET1_R, 0))
        make_face()
    revolve(axis=Axis((0, 5.9055, 9.525), (0, 1, 0)), mode=Mode.SUBTRACT)
    with BuildSketch(Plane(origin=(0, 2.7305, 9.525), x_dir=(0, 0, 1), z_dir=(-1, 0, 0))) as fillet1_piece_24:
        with BuildLine():
            CenterArc((1.4732 + FILLET1_R, FILLET1_R), FILLET1_R, 180, 90)
            Line((1.4732, FILLET1_R), (1.4732, 0))
            Line((1.4732, 0), (1.4732 + FILLET1_R, 0))
        make_face()
    revolve(axis=Axis((0, 2.7305, 9.525), (0, 1, 0)), mode=Mode.SUBTRACT)
    with BuildSketch(Plane(origin=(-22.06625, -10.668, 0), x_dir=(0, 0, 1), z_dir=(1, 0, 0)), Plane(origin=(22.06625, 10.668, 3.175), x_dir=(0, -1, 0), z_dir=(-1, 0, 0))) as fillet1_piece_25:
        with BuildLine():
            CenterArc((FILLET1_R, -FILLET1_R), FILLET1_R, 90, 90)
            Line((0, -FILLET1_R), (0, 0))
            Line((0, 0), (FILLET1_R, 0))
        make_face()
    extrude(amount=44.1325, mode=Mode.SUBTRACT)
    with BuildSketch(Plane(origin=(-22.86, 9.87425, 0), x_dir=(0, 0, 1), z_dir=(0, -1, 0)), Plane(origin=(22.86, -9.87425, 0), x_dir=(0, 0, 1), z_dir=(0, 1, 0))) as fillet1_piece_26:
        with BuildLine():
            CenterArc((FILLET1_R, -FILLET1_R), FILLET1_R, 90, 90)
            Line((0, -FILLET1_R), (0, 0))
            Line((0, 0), (FILLET1_R, 0))
        make_face()
    extrude(amount=19.7485, mode=Mode.SUBTRACT)
    with BuildSketch(Plane(origin=(22.86, -10.668, 0.79375), x_dir=(-1, 0, 0), z_dir=(0, 0, 1)), Plane(origin=(22.86, 10.668, 0.79375), x_dir=(0, -1, 0), z_dir=(0, 0, 1))) as fillet1_piece_27:
        with BuildLine():
            CenterArc((FILLET1_R, -FILLET1_R), FILLET1_R, 90, 90)
            Line((0, -FILLET1_R), (0, 0))
            Line((0, 0), (FILLET1_R, 0))
        make_face()
    extrude(amount=1.5875, mode=Mode.SUBTRACT)
    # the kernel refuses this fillet: 0.79375 mm, written as the material it adds along each edge
    with BuildSketch(Plane(origin=(6.35, 3.52425, 3.175), x_dir=(1, 0, 0), z_dir=(0, 1, 0)), Plane(origin=(-6.35, 5.11175, 3.175), x_dir=(-1, 0, 0), z_dir=(0, -1, 0))) as fillet1_2_piece_1:
        with BuildLine():
            CenterArc((FILLET1_R, -FILLET1_R), FILLET1_R, 90, 90)
            Line((0, -FILLET1_R), (0, 0))
            Line((0, 0), (FILLET1_R, 0))
        make_face()
    extrude(amount=1.5875)
    with BuildSketch(Plane(origin=(5.55625, 5.9055, 3.175), x_dir=(0, 1, 0), z_dir=(-1, 0, 0)), Plane(origin=(-5.55625, 2.7305, 3.175), x_dir=(0, -1, 0), z_dir=(1, 0, 0))) as fillet1_2_piece_2:
        with BuildLine():
            CenterArc((FILLET1_R, -FILLET1_R), FILLET1_R, 90, 90)
            Line((0, -FILLET1_R), (0, 0))
            Line((0, 0), (FILLET1_R, 0))
        make_face()
    extrude(amount=11.1125)
    with BuildSketch(Plane(origin=(-5.55625, 3.52425, 3.175), x_dir=(0, -1, 0), z_dir=(1, 0, 0))) as fillet1_2_piece_3:
        with BuildLine():
            CenterArc((0.79375 + FILLET1_R, -FILLET1_R), FILLET1_R, 90, 90)
            Line((0.79375, -FILLET1_R), (0.79375, 0))
            Line((0.79375, 0), (0.79375 + FILLET1_R, 0))
        make_face()
    revolve(axis=Axis((-5.55625, 3.52425, 3.175), (0, 0, -1)), revolution_arc=90)
    with BuildSketch(Plane(origin=(5.55625, 3.52425, 3.175), x_dir=(0, -1, 0), z_dir=(-1, 0, 0))) as fillet1_2_piece_4:
        with BuildLine():
            CenterArc((0.79375 + FILLET1_R, FILLET1_R), FILLET1_R, 180, 90)
            Line((0.79375, FILLET1_R), (0.79375, 0))
            Line((0.79375, 0), (0.79375 + FILLET1_R, 0))
        make_face()
    revolve(axis=Axis((5.55625, 3.52425, 3.175), (0, 0, 1)), revolution_arc=90)
    with BuildSketch(Plane(origin=(-5.55625, 5.11175, 3.175), x_dir=(0, 1, 0), z_dir=(1, 0, 0))) as fillet1_2_piece_5:
        with BuildLine():
            CenterArc((0.79375 + FILLET1_R, FILLET1_R), FILLET1_R, 180, 90)
            Line((0.79375, FILLET1_R), (0.79375, 0))
            Line((0.79375, 0), (0.79375 + FILLET1_R, 0))
        make_face()
    revolve(axis=Axis((-5.55625, 5.11175, 3.175), (0, 0, 1)), revolution_arc=90)
    with BuildSketch(Plane(origin=(5.55625, 5.11175, 3.175), x_dir=(1, 0, 0), z_dir=(0, -1, 0))) as fillet1_2_piece_6:
        with BuildLine():
            CenterArc((0.79375 + FILLET1_R, FILLET1_R), FILLET1_R, 180, 90)
            Line((0.79375, FILLET1_R), (0.79375, 0))
            Line((0.79375, 0), (0.79375 + FILLET1_R, 0))
        make_face()
    revolve(axis=Axis((5.55625, 5.11175, 3.175), (0, 0, 1)), revolution_arc=90)


solid = part.part
